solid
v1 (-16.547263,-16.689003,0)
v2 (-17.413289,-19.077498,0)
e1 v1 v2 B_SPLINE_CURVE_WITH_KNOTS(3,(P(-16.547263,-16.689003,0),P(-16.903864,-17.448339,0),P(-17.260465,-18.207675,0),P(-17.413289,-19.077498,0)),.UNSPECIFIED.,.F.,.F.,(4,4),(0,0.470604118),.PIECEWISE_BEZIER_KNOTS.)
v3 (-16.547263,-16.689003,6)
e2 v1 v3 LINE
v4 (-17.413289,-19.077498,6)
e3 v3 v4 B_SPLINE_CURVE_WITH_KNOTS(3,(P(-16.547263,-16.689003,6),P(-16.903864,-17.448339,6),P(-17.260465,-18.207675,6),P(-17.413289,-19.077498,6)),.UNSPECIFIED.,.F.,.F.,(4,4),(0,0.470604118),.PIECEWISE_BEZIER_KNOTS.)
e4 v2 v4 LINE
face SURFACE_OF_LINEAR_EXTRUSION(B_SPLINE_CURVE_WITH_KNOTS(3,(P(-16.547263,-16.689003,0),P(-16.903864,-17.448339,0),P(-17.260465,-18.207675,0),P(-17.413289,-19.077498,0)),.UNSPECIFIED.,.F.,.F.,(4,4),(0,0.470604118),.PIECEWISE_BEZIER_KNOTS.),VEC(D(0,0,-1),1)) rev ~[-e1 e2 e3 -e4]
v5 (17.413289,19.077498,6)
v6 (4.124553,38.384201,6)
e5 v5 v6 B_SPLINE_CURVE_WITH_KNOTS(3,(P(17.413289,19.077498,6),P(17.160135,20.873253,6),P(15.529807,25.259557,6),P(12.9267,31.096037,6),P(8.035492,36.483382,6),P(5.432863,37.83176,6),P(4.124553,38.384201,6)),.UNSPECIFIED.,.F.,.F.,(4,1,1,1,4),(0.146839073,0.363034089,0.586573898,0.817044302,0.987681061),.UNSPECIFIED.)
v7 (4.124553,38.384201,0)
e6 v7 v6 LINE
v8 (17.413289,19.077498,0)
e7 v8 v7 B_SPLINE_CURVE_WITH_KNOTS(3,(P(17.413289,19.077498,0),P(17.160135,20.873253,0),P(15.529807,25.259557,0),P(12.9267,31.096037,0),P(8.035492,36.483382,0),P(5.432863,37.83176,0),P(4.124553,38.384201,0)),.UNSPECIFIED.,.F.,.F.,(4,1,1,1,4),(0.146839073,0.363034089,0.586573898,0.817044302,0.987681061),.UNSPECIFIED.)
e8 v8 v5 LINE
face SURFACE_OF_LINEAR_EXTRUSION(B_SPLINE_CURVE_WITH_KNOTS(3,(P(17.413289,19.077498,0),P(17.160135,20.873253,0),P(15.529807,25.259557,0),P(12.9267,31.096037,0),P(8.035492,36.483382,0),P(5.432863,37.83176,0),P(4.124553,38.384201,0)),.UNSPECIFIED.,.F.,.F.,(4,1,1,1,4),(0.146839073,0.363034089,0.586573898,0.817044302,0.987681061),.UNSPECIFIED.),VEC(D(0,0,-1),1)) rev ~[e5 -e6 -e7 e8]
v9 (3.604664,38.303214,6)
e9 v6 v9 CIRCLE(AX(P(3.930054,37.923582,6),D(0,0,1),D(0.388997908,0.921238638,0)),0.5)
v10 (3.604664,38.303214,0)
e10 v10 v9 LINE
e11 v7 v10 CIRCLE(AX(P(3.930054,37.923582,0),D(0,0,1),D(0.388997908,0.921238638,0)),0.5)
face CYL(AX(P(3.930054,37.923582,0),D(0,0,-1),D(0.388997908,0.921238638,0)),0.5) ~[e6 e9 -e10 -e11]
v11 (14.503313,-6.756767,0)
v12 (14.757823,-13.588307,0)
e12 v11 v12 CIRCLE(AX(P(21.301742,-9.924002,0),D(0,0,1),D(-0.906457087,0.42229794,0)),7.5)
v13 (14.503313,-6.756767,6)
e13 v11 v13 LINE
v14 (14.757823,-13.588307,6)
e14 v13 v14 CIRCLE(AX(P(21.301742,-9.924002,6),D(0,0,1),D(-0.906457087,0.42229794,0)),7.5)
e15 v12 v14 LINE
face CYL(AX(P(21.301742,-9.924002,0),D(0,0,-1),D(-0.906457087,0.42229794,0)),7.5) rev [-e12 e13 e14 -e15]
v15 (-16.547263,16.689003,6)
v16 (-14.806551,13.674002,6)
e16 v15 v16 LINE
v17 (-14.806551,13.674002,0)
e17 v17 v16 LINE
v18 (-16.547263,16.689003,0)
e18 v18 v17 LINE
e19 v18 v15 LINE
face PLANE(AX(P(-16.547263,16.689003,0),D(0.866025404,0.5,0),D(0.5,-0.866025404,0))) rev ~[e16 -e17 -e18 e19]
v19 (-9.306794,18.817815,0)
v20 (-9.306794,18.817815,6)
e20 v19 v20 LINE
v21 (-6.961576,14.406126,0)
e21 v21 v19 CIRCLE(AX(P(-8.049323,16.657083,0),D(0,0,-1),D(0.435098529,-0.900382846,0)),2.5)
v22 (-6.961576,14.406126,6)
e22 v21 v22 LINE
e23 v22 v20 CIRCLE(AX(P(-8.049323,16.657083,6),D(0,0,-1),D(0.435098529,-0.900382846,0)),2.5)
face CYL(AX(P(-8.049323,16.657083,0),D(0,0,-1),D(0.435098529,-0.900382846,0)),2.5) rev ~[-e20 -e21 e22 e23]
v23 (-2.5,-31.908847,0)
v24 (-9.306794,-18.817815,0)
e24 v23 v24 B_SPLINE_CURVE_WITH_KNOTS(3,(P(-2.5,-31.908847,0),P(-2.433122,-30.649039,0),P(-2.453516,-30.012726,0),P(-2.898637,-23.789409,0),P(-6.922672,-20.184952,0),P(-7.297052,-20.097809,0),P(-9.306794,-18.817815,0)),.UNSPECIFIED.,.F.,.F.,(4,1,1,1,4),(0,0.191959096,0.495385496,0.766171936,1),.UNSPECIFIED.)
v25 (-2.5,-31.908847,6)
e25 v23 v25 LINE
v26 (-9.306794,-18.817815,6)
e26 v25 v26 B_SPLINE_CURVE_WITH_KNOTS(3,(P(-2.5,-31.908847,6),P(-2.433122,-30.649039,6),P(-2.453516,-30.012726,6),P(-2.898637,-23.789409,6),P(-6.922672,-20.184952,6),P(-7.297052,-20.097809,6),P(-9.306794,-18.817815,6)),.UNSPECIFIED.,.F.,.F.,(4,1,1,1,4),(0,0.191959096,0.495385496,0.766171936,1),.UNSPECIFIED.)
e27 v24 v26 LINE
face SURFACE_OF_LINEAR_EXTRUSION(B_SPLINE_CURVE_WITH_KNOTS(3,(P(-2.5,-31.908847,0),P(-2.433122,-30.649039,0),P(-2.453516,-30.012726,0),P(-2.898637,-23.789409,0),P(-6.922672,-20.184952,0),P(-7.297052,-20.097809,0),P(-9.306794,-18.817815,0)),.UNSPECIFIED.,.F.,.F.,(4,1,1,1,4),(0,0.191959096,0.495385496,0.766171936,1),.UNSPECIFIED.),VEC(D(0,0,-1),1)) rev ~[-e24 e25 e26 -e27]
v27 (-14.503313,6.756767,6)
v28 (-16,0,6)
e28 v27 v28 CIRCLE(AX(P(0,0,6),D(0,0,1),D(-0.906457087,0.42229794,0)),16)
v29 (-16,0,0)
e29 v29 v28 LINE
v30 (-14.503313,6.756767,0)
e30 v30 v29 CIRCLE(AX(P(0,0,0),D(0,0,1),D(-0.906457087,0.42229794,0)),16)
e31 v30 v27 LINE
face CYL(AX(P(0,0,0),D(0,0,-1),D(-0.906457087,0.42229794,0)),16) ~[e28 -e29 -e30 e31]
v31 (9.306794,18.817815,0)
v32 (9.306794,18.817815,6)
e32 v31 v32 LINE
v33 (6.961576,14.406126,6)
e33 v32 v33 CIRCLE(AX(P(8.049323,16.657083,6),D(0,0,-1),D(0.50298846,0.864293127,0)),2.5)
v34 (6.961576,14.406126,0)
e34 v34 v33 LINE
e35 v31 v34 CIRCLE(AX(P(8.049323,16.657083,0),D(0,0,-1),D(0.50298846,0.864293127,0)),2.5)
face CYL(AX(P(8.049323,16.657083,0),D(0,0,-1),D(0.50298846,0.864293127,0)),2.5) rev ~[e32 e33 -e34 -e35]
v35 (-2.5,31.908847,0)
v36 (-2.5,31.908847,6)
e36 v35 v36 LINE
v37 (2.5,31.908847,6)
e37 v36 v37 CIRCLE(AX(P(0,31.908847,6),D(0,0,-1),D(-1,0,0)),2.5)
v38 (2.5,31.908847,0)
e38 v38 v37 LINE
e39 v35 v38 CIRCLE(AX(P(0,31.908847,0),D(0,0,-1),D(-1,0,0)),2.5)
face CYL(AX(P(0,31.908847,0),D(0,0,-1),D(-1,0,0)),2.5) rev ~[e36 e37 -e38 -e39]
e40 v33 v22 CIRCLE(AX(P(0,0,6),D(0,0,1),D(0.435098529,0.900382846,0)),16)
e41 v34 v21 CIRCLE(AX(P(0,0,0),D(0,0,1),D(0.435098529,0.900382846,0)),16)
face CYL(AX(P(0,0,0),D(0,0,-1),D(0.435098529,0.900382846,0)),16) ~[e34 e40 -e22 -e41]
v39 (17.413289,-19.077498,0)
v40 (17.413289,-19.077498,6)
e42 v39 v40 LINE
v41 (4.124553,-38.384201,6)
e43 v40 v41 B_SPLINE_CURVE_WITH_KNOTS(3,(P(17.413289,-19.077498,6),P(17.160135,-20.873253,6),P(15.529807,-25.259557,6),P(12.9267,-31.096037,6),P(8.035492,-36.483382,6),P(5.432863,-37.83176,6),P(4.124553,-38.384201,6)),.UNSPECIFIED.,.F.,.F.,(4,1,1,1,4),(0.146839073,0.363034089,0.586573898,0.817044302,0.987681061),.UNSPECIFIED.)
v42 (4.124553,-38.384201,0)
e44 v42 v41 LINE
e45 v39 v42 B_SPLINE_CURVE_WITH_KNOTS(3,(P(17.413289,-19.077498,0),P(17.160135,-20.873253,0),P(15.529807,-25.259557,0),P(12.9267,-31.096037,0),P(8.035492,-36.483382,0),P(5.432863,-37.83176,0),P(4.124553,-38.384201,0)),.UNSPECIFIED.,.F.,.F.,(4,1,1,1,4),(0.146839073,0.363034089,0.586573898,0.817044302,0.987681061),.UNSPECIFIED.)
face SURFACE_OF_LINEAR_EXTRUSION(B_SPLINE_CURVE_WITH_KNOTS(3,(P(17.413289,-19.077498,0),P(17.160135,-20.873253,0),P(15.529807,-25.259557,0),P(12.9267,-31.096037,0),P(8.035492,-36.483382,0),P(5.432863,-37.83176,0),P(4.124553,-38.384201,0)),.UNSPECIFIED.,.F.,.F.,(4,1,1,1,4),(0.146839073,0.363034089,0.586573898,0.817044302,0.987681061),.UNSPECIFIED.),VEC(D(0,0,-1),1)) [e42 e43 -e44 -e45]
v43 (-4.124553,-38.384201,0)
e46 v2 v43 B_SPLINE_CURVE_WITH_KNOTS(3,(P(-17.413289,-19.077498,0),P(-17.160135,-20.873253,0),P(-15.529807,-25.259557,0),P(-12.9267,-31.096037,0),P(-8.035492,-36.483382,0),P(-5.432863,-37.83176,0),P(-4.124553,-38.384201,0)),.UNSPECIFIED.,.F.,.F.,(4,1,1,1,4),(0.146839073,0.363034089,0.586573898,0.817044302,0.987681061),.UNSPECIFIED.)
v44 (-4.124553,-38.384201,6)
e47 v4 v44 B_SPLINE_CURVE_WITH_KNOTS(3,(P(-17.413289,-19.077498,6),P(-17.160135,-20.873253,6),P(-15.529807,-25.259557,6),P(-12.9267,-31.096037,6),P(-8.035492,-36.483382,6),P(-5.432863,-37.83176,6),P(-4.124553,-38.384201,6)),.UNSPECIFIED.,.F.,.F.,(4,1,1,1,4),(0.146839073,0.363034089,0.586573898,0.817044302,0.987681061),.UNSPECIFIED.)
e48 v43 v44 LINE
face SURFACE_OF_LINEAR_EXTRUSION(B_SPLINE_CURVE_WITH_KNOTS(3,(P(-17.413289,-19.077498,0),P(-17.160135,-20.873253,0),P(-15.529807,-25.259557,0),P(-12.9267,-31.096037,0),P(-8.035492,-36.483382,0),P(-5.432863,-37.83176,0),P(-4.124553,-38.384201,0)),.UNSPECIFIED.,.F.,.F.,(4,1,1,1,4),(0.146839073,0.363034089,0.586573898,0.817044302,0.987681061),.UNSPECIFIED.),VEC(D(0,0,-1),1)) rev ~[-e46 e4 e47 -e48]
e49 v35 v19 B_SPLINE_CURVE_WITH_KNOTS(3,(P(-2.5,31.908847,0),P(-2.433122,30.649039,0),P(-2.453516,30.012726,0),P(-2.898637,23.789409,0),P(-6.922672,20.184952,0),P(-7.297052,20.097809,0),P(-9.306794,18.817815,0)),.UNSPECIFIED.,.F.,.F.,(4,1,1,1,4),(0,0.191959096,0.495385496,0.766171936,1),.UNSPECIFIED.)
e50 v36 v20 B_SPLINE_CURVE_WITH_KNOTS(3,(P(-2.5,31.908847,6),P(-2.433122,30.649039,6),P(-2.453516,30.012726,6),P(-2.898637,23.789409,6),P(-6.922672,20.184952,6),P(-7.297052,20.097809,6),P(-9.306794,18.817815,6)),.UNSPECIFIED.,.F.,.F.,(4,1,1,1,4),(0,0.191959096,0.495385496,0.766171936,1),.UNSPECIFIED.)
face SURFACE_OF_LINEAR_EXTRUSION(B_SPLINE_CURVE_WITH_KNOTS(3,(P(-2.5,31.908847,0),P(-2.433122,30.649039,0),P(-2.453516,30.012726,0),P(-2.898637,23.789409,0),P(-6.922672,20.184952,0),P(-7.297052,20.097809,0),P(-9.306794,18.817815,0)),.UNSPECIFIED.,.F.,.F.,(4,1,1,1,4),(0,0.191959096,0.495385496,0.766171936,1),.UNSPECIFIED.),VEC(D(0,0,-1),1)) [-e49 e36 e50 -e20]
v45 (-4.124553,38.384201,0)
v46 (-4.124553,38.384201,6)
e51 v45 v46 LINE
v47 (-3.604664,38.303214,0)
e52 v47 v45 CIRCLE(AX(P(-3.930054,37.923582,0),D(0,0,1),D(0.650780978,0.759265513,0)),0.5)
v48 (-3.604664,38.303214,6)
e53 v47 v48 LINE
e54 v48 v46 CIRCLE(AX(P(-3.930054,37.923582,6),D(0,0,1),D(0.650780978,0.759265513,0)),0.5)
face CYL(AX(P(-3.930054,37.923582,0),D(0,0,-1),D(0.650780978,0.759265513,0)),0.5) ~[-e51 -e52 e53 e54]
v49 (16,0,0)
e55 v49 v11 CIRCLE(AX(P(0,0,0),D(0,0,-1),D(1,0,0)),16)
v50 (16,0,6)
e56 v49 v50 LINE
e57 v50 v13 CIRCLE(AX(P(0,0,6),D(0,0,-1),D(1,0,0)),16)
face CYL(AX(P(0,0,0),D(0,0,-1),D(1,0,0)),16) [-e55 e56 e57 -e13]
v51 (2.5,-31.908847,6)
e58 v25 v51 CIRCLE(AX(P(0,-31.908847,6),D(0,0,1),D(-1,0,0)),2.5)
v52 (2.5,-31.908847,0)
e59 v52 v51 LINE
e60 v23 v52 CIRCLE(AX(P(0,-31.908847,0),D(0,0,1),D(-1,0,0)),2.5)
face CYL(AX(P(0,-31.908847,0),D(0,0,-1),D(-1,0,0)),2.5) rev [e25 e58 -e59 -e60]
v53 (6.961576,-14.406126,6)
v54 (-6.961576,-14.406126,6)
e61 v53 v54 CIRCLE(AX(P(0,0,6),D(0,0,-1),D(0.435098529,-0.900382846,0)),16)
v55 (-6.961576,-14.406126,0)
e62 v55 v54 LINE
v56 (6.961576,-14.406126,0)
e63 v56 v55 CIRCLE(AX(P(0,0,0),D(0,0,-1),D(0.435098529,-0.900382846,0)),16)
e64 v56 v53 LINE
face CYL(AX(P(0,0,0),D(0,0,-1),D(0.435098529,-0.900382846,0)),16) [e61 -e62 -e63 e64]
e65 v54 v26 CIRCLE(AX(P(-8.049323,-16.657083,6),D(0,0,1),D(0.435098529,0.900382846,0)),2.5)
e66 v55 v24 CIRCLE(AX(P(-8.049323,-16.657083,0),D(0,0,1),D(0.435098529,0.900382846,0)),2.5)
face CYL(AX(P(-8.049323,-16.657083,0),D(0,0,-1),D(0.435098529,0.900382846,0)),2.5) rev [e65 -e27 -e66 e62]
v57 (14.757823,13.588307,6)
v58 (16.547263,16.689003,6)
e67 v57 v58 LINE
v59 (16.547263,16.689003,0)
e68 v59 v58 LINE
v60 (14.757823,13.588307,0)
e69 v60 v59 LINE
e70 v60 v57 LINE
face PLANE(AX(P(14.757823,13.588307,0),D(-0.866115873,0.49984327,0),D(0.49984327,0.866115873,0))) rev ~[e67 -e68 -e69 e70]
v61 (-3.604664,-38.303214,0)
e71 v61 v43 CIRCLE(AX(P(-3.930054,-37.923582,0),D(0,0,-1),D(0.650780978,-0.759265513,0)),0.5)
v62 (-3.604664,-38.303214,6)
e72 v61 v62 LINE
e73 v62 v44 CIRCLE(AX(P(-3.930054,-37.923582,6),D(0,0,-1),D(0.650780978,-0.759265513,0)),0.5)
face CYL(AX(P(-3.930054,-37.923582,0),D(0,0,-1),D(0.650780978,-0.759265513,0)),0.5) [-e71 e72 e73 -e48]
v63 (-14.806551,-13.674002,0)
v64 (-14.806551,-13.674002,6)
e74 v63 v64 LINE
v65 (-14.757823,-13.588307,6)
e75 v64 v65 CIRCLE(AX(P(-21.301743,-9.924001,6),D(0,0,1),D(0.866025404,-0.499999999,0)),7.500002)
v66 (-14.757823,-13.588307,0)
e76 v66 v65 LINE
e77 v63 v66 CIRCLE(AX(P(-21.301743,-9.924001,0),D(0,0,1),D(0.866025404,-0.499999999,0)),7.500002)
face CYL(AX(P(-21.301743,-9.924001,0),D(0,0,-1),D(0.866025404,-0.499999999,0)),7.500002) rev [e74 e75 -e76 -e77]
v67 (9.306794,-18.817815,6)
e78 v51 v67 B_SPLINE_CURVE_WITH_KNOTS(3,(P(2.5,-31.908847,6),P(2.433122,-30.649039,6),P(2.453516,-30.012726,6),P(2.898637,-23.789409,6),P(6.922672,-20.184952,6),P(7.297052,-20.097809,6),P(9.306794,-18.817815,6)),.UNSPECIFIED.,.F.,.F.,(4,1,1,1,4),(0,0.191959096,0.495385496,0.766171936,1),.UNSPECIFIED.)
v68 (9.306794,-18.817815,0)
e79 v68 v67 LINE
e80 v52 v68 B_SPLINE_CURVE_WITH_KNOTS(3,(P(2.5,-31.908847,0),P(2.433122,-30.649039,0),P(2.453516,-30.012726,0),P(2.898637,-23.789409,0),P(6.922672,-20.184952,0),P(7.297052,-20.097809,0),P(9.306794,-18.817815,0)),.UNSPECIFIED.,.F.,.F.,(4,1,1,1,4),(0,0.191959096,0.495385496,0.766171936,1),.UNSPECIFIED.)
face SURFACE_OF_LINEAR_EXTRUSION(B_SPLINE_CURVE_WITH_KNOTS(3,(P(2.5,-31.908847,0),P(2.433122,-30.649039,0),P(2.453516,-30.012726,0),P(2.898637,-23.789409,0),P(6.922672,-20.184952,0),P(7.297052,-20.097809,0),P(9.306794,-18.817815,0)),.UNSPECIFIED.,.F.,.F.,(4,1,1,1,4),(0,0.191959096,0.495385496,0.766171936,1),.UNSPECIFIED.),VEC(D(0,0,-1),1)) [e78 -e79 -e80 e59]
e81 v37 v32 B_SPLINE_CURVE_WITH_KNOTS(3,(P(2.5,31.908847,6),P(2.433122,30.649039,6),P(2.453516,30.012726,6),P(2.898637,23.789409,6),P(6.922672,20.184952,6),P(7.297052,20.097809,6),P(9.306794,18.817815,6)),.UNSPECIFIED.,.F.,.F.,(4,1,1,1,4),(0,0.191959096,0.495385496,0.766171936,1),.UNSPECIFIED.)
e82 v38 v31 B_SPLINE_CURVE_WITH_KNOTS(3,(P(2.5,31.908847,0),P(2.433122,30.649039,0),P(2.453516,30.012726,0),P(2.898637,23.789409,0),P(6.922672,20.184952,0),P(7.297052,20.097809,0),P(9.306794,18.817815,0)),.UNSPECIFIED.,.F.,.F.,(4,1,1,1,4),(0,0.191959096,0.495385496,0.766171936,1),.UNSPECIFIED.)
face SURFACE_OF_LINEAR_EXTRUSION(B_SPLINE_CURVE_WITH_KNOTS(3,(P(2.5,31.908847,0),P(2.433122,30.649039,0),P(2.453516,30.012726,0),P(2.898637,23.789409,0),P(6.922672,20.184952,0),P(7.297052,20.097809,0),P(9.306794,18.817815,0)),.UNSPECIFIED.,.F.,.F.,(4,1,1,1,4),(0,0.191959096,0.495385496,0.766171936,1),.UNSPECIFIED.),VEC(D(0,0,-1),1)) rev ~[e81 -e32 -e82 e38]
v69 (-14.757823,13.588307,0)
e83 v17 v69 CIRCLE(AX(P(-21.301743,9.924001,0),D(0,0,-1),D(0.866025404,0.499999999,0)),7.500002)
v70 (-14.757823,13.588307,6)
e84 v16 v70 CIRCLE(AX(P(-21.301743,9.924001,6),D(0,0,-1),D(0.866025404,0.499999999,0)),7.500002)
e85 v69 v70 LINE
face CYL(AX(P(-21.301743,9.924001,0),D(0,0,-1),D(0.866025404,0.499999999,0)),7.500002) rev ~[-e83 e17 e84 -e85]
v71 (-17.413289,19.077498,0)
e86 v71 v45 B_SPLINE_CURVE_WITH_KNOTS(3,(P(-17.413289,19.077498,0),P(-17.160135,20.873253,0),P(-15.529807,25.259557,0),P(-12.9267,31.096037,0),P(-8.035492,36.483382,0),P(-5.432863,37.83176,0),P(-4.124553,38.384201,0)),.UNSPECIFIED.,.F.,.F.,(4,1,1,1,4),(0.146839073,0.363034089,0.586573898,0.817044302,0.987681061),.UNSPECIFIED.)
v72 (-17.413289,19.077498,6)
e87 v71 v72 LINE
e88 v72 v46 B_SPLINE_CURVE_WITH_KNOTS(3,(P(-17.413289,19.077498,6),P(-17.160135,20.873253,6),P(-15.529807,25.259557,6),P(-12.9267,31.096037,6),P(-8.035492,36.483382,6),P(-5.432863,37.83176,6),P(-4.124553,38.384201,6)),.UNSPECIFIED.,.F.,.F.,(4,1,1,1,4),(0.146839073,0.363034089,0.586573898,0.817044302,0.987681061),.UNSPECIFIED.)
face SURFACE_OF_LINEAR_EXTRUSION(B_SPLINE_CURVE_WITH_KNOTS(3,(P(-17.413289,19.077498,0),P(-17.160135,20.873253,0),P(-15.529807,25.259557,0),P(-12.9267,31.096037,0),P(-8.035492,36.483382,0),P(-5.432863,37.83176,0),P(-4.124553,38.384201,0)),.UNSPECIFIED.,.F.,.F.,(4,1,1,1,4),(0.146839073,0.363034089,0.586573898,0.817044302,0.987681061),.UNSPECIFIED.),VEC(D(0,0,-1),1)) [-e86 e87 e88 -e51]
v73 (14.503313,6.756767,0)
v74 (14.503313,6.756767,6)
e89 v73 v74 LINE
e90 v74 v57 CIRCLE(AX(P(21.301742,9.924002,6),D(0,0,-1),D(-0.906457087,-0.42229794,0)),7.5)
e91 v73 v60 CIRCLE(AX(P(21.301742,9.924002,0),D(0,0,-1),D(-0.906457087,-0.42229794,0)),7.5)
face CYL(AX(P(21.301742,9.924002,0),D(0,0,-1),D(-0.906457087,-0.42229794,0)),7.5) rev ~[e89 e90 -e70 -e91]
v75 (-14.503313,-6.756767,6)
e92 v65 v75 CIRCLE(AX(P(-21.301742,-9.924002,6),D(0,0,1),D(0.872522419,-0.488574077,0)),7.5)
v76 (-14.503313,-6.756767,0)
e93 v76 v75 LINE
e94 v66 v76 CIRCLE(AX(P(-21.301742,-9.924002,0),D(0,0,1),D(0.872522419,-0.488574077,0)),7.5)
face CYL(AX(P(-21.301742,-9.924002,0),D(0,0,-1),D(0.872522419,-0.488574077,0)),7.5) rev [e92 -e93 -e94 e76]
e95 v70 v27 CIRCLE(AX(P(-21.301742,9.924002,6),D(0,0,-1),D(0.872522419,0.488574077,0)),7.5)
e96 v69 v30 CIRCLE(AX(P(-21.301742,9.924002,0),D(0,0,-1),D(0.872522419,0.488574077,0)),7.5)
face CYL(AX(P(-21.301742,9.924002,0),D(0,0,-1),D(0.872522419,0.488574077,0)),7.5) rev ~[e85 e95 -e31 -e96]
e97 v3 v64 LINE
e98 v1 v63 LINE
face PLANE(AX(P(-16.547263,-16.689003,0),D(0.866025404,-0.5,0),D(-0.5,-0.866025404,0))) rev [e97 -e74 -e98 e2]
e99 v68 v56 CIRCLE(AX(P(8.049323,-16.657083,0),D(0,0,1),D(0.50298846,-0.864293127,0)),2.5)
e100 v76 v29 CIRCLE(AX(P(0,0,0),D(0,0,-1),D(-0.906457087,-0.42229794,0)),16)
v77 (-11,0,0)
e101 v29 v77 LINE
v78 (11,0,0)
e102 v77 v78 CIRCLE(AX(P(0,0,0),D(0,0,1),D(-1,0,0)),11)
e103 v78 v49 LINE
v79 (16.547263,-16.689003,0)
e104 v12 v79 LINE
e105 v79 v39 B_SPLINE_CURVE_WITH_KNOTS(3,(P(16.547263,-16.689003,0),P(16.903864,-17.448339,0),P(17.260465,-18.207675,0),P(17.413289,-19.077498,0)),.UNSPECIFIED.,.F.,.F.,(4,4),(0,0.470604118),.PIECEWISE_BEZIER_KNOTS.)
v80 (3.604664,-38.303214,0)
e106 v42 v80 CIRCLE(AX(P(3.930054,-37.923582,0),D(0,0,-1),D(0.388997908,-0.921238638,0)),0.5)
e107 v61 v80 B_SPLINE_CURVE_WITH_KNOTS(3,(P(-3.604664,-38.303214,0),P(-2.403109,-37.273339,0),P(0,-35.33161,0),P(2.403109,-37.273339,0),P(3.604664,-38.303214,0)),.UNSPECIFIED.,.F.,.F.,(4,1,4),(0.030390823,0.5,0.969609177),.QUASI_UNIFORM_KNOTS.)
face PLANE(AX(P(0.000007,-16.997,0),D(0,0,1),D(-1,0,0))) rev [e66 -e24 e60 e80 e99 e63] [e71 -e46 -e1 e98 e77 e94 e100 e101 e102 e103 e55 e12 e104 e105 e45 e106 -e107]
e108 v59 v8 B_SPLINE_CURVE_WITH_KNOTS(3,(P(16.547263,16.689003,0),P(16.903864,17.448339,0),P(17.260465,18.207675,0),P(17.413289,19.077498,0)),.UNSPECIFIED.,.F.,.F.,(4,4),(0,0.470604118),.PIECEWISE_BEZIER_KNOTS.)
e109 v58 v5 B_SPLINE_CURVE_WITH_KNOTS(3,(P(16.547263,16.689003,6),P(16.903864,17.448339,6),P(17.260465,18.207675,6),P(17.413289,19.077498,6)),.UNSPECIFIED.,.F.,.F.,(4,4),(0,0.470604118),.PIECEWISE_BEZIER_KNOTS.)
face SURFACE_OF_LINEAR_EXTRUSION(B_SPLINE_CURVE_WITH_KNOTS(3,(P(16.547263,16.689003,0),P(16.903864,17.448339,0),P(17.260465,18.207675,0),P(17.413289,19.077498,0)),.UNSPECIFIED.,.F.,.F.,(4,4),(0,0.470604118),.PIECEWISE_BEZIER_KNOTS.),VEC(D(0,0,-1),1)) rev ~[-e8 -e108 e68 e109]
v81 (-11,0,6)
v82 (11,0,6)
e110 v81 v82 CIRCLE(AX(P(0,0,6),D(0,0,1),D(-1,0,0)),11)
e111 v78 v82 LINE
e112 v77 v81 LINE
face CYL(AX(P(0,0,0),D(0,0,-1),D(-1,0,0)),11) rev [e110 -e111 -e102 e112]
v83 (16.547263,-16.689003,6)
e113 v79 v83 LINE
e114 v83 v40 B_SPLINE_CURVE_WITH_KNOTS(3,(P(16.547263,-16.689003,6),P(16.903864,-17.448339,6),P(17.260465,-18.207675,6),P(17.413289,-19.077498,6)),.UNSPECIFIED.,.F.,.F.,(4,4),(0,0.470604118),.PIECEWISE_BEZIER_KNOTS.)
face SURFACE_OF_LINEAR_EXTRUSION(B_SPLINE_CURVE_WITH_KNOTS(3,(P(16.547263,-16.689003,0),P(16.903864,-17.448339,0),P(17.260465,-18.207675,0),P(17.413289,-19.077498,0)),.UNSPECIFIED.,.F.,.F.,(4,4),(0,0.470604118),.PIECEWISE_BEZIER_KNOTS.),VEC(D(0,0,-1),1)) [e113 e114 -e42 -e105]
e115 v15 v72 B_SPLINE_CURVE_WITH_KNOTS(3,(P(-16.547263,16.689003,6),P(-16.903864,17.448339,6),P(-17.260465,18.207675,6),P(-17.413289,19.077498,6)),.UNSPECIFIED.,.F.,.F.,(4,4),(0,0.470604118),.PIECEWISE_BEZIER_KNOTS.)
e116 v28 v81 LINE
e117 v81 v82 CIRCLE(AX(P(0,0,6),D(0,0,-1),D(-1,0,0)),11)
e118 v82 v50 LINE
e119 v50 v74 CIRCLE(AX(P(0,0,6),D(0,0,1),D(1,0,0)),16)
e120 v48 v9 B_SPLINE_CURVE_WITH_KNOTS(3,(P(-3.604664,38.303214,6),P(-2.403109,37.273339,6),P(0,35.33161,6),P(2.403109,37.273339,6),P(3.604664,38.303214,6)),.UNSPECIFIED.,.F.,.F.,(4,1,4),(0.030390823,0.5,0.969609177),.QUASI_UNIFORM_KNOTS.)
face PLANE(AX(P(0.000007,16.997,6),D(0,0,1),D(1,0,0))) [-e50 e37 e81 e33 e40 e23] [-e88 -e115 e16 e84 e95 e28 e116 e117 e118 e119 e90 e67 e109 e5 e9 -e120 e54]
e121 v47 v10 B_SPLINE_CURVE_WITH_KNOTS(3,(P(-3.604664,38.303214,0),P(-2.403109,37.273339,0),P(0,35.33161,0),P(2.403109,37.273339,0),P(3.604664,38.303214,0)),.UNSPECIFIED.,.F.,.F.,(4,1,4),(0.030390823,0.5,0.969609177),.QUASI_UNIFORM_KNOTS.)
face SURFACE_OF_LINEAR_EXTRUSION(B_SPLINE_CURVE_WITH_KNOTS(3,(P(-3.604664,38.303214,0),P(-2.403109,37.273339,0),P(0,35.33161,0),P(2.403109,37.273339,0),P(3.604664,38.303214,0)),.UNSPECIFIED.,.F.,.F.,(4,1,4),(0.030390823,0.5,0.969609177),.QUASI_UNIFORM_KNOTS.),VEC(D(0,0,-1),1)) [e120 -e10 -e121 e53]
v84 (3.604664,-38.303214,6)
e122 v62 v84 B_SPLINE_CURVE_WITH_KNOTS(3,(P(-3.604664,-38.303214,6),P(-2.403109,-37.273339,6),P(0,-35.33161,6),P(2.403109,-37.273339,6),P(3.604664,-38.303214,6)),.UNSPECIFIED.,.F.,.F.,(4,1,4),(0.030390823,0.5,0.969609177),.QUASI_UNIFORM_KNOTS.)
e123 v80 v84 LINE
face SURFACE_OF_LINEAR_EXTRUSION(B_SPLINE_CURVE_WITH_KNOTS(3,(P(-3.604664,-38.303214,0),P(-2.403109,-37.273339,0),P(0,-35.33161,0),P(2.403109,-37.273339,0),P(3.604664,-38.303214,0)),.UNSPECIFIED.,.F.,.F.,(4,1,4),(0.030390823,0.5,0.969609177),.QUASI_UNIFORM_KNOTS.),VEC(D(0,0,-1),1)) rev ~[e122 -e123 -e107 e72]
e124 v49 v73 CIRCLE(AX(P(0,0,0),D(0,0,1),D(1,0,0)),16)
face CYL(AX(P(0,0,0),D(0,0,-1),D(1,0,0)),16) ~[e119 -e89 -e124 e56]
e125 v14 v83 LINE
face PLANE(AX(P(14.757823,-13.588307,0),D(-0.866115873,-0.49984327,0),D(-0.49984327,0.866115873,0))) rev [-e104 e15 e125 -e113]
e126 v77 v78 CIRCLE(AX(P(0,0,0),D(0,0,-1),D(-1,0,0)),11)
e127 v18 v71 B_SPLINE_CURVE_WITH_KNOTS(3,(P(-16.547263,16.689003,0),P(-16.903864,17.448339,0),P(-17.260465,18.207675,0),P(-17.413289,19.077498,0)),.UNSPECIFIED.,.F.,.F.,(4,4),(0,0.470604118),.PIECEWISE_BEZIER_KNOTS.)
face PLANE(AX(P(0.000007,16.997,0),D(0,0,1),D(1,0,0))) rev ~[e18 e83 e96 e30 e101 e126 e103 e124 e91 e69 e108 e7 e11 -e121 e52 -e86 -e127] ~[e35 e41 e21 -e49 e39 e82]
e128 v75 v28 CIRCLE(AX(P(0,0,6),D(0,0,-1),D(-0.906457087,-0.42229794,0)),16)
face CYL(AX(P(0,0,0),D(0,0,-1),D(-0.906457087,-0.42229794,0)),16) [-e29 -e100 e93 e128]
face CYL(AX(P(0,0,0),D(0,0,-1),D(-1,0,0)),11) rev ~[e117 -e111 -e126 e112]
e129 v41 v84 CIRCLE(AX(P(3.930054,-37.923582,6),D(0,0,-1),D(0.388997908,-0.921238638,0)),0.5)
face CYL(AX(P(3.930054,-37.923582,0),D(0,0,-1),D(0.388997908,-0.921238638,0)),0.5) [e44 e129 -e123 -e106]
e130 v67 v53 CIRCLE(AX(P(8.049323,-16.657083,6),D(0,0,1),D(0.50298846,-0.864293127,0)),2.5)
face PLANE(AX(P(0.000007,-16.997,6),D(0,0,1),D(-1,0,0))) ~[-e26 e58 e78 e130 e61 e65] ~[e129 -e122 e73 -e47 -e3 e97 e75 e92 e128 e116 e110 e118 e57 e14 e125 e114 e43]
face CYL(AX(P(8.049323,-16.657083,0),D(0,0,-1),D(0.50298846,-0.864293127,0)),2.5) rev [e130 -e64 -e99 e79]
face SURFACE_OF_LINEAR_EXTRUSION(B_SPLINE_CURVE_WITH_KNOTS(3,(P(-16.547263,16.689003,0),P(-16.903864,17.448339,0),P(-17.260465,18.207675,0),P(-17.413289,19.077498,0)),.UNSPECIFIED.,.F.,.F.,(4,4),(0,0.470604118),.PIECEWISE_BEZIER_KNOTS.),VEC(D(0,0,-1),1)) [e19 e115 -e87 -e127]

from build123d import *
from build123d import SkipClean  # not in build123d's __all__

# Parameters (mm, degrees)
F1_DEPTH = 6


with BuildPart() as f1:
    # F0 (on Top) → F1 (new body)
    with BuildSketch(Plane.XY):
        with BuildLine():
            Line((11, 0), (16, 1.6e-09))
            ThreePointArc((16, 1.6e-09), (15.6213478003, 3.4602735298), (14.5033133881, 6.7567670352))
            ThreePointArc((14.5033133881, 6.7567670352), (13.8069409235, 10.2032214588), (14.7578233989, 13.5883071625))
            Line((14.7578233989, 13.5883071625), (16.5472631726, 16.6890034893))
            add(Edge.make_bspline(
                [(16.5472631726, 16.6890034893), (16.9038641607, 17.448339213), (17.2604651496, 18.2076749358), (17.4132885774, 19.0774979941)],
                knots=[0, 0, 0, 0, 0.470604118, 0.470604118, 0.470604118, 0.470604118], degree=3))
            add(Edge.make_bspline(
                [(17.4132885774, 19.0774979941), (17.1601349358, 20.8732534921), (15.5298067403, 25.2595570374), (12.9266999076, 31.0960374776), (8.0354918433, 36.4833822131), (5.4328634191, 37.8317600488), (4.1245531765, 38.3842009986)],
                knots=[0.1468390725, 0.1468390725, 0.1468390725, 0.1468390725, 0.3630340887, 0.5865738983, 0.817044302, 0.9876810607, 0.9876810607, 0.9876810607, 0.9876810607], degree=3))
            ThreePointArc((4.1245531765, 38.3842009986), (3.8530941398, 38.4176233235), (3.6046637333, 38.3032144361))
            add(Edge.make_bspline(
                [(-3.6046637371, 38.3032144358), (-2.4031091586, 37.2733390488), (-1.8e-09, 35.3316097761), (2.4031091549, 37.2733390491), (3.6046637333, 38.3032144361)],
                knots=[0.030390823, 0.030390823, 0.030390823, 0.030390823, 0.5, 0.969609177, 0.969609177, 0.969609177, 0.969609177], degree=3))
            ThreePointArc((-3.6046637371, 38.3032144358), (-3.8530941436, 38.4176233231), (-4.1245531803, 38.3842009982))
            add(Edge.make_bspline(
                [(-17.4132885793, 19.0774979924), (-17.1601349379, 20.8732534904), (-15.5298067428, 25.2595570358), (-12.9266999107, 31.0960374763), (-8.035491847, 36.4833822123), (-5.4328634228, 37.8317600483), (-4.1245531803, 38.3842009982)],
                knots=[0.1468390725, 0.1468390725, 0.1468390725, 0.1468390725, 0.3630340887, 0.5865738983, 0.817044302, 0.9876810607, 0.9876810607, 0.9876810607, 0.9876810607], degree=3))
            add(Edge.make_bspline(
                [(-16.5472631742, 16.6890034877), (-16.9038641624, 17.4483392113), (-17.2604651514, 18.2076749341), (-17.4132885793, 19.0774979924)],
                knots=[0, 0, 0, 0, 0.470604118, 0.470604118, 0.470604118, 0.470604118], degree=3))
            Line((-16.5472631742, 16.6890034877), (-14.8065510117, 13.6740015815))
            ThreePointArc((-14.8065510117, 13.6740015815), (-14.7820464093, 13.6312344311), (-14.7578234003, 13.588307161))
            ThreePointArc((-14.7578234003, 13.588307161), (-13.8069409246, 10.2032214574), (-14.5033133887, 6.7567670338))
            ThreePointArc((-14.5033133887, 6.7567670338), (-15.6213478009, 3.4602735275), (-16, -1.6e-09))
            Line((-16, -1.6e-09), (-11, 0))
            ThreePointArc((-11, 0), (0, 11), (11, 0))
        make_face()
        with BuildLine():
            ThreePointArc((-2.5000000016, 31.9088473916), (-1.7e-09, 34.4088473916), (2.4999999984, 31.9088473919))
            add(Edge.make_bspline(
                [(2.4999999984, 31.9088473919), (2.4331220875, 30.6490394366), (2.4535157786, 30.0127263528), (2.8986373447, 23.7894092906), (6.9226723249, 20.184951896), (7.2970524431, 20.0978087895), (9.3067939385, 18.8178154741)],
                knots=[0, 0, 0, 0, 0.1919590959, 0.4953854958, 0.7661719362, 1, 1, 1, 1], degree=3))
            ThreePointArc((9.3067939385, 18.8178154741), (10.256799547, 15.4836064731), (6.9615764648, 14.4061255418))
            ThreePointArc((6.9615764648, 14.4061255418), (-8e-10, 16), (-6.9615764662, 14.4061255411))
            ThreePointArc((-6.9615764662, 14.4061255411), (-10.2567995485, 15.483606472), (-9.3067939404, 18.8178154732))
            add(Edge.make_bspline(
                [(-2.5000000016, 31.9088473916), (-2.4331220905, 30.6490394363), (-2.4535157816, 30.0127263526), (-2.898637347, 23.7894092903), (-6.9226723269, 20.1849518953), (-7.2970524451, 20.0978087888), (-9.3067939404, 18.8178154732)],
                knots=[0, 0, 0, 0, 0.1919590959, 0.4953854958, 0.7661719362, 1, 1, 1, 1], degree=3))
        make_face(mode=Mode.SUBTRACT)
    extrude(amount=F1_DEPTH)

    # F2: F1 across plane


with BuildPart() as f1_1:
    add(f1.part, clean=False)
    with SkipClean():  # cleaning this boolean's faces spoils the solid; the shape is the same uncleaned
        add(f1.part.mirror(Plane.XZ), clean=False)


solid = f1_1.part
